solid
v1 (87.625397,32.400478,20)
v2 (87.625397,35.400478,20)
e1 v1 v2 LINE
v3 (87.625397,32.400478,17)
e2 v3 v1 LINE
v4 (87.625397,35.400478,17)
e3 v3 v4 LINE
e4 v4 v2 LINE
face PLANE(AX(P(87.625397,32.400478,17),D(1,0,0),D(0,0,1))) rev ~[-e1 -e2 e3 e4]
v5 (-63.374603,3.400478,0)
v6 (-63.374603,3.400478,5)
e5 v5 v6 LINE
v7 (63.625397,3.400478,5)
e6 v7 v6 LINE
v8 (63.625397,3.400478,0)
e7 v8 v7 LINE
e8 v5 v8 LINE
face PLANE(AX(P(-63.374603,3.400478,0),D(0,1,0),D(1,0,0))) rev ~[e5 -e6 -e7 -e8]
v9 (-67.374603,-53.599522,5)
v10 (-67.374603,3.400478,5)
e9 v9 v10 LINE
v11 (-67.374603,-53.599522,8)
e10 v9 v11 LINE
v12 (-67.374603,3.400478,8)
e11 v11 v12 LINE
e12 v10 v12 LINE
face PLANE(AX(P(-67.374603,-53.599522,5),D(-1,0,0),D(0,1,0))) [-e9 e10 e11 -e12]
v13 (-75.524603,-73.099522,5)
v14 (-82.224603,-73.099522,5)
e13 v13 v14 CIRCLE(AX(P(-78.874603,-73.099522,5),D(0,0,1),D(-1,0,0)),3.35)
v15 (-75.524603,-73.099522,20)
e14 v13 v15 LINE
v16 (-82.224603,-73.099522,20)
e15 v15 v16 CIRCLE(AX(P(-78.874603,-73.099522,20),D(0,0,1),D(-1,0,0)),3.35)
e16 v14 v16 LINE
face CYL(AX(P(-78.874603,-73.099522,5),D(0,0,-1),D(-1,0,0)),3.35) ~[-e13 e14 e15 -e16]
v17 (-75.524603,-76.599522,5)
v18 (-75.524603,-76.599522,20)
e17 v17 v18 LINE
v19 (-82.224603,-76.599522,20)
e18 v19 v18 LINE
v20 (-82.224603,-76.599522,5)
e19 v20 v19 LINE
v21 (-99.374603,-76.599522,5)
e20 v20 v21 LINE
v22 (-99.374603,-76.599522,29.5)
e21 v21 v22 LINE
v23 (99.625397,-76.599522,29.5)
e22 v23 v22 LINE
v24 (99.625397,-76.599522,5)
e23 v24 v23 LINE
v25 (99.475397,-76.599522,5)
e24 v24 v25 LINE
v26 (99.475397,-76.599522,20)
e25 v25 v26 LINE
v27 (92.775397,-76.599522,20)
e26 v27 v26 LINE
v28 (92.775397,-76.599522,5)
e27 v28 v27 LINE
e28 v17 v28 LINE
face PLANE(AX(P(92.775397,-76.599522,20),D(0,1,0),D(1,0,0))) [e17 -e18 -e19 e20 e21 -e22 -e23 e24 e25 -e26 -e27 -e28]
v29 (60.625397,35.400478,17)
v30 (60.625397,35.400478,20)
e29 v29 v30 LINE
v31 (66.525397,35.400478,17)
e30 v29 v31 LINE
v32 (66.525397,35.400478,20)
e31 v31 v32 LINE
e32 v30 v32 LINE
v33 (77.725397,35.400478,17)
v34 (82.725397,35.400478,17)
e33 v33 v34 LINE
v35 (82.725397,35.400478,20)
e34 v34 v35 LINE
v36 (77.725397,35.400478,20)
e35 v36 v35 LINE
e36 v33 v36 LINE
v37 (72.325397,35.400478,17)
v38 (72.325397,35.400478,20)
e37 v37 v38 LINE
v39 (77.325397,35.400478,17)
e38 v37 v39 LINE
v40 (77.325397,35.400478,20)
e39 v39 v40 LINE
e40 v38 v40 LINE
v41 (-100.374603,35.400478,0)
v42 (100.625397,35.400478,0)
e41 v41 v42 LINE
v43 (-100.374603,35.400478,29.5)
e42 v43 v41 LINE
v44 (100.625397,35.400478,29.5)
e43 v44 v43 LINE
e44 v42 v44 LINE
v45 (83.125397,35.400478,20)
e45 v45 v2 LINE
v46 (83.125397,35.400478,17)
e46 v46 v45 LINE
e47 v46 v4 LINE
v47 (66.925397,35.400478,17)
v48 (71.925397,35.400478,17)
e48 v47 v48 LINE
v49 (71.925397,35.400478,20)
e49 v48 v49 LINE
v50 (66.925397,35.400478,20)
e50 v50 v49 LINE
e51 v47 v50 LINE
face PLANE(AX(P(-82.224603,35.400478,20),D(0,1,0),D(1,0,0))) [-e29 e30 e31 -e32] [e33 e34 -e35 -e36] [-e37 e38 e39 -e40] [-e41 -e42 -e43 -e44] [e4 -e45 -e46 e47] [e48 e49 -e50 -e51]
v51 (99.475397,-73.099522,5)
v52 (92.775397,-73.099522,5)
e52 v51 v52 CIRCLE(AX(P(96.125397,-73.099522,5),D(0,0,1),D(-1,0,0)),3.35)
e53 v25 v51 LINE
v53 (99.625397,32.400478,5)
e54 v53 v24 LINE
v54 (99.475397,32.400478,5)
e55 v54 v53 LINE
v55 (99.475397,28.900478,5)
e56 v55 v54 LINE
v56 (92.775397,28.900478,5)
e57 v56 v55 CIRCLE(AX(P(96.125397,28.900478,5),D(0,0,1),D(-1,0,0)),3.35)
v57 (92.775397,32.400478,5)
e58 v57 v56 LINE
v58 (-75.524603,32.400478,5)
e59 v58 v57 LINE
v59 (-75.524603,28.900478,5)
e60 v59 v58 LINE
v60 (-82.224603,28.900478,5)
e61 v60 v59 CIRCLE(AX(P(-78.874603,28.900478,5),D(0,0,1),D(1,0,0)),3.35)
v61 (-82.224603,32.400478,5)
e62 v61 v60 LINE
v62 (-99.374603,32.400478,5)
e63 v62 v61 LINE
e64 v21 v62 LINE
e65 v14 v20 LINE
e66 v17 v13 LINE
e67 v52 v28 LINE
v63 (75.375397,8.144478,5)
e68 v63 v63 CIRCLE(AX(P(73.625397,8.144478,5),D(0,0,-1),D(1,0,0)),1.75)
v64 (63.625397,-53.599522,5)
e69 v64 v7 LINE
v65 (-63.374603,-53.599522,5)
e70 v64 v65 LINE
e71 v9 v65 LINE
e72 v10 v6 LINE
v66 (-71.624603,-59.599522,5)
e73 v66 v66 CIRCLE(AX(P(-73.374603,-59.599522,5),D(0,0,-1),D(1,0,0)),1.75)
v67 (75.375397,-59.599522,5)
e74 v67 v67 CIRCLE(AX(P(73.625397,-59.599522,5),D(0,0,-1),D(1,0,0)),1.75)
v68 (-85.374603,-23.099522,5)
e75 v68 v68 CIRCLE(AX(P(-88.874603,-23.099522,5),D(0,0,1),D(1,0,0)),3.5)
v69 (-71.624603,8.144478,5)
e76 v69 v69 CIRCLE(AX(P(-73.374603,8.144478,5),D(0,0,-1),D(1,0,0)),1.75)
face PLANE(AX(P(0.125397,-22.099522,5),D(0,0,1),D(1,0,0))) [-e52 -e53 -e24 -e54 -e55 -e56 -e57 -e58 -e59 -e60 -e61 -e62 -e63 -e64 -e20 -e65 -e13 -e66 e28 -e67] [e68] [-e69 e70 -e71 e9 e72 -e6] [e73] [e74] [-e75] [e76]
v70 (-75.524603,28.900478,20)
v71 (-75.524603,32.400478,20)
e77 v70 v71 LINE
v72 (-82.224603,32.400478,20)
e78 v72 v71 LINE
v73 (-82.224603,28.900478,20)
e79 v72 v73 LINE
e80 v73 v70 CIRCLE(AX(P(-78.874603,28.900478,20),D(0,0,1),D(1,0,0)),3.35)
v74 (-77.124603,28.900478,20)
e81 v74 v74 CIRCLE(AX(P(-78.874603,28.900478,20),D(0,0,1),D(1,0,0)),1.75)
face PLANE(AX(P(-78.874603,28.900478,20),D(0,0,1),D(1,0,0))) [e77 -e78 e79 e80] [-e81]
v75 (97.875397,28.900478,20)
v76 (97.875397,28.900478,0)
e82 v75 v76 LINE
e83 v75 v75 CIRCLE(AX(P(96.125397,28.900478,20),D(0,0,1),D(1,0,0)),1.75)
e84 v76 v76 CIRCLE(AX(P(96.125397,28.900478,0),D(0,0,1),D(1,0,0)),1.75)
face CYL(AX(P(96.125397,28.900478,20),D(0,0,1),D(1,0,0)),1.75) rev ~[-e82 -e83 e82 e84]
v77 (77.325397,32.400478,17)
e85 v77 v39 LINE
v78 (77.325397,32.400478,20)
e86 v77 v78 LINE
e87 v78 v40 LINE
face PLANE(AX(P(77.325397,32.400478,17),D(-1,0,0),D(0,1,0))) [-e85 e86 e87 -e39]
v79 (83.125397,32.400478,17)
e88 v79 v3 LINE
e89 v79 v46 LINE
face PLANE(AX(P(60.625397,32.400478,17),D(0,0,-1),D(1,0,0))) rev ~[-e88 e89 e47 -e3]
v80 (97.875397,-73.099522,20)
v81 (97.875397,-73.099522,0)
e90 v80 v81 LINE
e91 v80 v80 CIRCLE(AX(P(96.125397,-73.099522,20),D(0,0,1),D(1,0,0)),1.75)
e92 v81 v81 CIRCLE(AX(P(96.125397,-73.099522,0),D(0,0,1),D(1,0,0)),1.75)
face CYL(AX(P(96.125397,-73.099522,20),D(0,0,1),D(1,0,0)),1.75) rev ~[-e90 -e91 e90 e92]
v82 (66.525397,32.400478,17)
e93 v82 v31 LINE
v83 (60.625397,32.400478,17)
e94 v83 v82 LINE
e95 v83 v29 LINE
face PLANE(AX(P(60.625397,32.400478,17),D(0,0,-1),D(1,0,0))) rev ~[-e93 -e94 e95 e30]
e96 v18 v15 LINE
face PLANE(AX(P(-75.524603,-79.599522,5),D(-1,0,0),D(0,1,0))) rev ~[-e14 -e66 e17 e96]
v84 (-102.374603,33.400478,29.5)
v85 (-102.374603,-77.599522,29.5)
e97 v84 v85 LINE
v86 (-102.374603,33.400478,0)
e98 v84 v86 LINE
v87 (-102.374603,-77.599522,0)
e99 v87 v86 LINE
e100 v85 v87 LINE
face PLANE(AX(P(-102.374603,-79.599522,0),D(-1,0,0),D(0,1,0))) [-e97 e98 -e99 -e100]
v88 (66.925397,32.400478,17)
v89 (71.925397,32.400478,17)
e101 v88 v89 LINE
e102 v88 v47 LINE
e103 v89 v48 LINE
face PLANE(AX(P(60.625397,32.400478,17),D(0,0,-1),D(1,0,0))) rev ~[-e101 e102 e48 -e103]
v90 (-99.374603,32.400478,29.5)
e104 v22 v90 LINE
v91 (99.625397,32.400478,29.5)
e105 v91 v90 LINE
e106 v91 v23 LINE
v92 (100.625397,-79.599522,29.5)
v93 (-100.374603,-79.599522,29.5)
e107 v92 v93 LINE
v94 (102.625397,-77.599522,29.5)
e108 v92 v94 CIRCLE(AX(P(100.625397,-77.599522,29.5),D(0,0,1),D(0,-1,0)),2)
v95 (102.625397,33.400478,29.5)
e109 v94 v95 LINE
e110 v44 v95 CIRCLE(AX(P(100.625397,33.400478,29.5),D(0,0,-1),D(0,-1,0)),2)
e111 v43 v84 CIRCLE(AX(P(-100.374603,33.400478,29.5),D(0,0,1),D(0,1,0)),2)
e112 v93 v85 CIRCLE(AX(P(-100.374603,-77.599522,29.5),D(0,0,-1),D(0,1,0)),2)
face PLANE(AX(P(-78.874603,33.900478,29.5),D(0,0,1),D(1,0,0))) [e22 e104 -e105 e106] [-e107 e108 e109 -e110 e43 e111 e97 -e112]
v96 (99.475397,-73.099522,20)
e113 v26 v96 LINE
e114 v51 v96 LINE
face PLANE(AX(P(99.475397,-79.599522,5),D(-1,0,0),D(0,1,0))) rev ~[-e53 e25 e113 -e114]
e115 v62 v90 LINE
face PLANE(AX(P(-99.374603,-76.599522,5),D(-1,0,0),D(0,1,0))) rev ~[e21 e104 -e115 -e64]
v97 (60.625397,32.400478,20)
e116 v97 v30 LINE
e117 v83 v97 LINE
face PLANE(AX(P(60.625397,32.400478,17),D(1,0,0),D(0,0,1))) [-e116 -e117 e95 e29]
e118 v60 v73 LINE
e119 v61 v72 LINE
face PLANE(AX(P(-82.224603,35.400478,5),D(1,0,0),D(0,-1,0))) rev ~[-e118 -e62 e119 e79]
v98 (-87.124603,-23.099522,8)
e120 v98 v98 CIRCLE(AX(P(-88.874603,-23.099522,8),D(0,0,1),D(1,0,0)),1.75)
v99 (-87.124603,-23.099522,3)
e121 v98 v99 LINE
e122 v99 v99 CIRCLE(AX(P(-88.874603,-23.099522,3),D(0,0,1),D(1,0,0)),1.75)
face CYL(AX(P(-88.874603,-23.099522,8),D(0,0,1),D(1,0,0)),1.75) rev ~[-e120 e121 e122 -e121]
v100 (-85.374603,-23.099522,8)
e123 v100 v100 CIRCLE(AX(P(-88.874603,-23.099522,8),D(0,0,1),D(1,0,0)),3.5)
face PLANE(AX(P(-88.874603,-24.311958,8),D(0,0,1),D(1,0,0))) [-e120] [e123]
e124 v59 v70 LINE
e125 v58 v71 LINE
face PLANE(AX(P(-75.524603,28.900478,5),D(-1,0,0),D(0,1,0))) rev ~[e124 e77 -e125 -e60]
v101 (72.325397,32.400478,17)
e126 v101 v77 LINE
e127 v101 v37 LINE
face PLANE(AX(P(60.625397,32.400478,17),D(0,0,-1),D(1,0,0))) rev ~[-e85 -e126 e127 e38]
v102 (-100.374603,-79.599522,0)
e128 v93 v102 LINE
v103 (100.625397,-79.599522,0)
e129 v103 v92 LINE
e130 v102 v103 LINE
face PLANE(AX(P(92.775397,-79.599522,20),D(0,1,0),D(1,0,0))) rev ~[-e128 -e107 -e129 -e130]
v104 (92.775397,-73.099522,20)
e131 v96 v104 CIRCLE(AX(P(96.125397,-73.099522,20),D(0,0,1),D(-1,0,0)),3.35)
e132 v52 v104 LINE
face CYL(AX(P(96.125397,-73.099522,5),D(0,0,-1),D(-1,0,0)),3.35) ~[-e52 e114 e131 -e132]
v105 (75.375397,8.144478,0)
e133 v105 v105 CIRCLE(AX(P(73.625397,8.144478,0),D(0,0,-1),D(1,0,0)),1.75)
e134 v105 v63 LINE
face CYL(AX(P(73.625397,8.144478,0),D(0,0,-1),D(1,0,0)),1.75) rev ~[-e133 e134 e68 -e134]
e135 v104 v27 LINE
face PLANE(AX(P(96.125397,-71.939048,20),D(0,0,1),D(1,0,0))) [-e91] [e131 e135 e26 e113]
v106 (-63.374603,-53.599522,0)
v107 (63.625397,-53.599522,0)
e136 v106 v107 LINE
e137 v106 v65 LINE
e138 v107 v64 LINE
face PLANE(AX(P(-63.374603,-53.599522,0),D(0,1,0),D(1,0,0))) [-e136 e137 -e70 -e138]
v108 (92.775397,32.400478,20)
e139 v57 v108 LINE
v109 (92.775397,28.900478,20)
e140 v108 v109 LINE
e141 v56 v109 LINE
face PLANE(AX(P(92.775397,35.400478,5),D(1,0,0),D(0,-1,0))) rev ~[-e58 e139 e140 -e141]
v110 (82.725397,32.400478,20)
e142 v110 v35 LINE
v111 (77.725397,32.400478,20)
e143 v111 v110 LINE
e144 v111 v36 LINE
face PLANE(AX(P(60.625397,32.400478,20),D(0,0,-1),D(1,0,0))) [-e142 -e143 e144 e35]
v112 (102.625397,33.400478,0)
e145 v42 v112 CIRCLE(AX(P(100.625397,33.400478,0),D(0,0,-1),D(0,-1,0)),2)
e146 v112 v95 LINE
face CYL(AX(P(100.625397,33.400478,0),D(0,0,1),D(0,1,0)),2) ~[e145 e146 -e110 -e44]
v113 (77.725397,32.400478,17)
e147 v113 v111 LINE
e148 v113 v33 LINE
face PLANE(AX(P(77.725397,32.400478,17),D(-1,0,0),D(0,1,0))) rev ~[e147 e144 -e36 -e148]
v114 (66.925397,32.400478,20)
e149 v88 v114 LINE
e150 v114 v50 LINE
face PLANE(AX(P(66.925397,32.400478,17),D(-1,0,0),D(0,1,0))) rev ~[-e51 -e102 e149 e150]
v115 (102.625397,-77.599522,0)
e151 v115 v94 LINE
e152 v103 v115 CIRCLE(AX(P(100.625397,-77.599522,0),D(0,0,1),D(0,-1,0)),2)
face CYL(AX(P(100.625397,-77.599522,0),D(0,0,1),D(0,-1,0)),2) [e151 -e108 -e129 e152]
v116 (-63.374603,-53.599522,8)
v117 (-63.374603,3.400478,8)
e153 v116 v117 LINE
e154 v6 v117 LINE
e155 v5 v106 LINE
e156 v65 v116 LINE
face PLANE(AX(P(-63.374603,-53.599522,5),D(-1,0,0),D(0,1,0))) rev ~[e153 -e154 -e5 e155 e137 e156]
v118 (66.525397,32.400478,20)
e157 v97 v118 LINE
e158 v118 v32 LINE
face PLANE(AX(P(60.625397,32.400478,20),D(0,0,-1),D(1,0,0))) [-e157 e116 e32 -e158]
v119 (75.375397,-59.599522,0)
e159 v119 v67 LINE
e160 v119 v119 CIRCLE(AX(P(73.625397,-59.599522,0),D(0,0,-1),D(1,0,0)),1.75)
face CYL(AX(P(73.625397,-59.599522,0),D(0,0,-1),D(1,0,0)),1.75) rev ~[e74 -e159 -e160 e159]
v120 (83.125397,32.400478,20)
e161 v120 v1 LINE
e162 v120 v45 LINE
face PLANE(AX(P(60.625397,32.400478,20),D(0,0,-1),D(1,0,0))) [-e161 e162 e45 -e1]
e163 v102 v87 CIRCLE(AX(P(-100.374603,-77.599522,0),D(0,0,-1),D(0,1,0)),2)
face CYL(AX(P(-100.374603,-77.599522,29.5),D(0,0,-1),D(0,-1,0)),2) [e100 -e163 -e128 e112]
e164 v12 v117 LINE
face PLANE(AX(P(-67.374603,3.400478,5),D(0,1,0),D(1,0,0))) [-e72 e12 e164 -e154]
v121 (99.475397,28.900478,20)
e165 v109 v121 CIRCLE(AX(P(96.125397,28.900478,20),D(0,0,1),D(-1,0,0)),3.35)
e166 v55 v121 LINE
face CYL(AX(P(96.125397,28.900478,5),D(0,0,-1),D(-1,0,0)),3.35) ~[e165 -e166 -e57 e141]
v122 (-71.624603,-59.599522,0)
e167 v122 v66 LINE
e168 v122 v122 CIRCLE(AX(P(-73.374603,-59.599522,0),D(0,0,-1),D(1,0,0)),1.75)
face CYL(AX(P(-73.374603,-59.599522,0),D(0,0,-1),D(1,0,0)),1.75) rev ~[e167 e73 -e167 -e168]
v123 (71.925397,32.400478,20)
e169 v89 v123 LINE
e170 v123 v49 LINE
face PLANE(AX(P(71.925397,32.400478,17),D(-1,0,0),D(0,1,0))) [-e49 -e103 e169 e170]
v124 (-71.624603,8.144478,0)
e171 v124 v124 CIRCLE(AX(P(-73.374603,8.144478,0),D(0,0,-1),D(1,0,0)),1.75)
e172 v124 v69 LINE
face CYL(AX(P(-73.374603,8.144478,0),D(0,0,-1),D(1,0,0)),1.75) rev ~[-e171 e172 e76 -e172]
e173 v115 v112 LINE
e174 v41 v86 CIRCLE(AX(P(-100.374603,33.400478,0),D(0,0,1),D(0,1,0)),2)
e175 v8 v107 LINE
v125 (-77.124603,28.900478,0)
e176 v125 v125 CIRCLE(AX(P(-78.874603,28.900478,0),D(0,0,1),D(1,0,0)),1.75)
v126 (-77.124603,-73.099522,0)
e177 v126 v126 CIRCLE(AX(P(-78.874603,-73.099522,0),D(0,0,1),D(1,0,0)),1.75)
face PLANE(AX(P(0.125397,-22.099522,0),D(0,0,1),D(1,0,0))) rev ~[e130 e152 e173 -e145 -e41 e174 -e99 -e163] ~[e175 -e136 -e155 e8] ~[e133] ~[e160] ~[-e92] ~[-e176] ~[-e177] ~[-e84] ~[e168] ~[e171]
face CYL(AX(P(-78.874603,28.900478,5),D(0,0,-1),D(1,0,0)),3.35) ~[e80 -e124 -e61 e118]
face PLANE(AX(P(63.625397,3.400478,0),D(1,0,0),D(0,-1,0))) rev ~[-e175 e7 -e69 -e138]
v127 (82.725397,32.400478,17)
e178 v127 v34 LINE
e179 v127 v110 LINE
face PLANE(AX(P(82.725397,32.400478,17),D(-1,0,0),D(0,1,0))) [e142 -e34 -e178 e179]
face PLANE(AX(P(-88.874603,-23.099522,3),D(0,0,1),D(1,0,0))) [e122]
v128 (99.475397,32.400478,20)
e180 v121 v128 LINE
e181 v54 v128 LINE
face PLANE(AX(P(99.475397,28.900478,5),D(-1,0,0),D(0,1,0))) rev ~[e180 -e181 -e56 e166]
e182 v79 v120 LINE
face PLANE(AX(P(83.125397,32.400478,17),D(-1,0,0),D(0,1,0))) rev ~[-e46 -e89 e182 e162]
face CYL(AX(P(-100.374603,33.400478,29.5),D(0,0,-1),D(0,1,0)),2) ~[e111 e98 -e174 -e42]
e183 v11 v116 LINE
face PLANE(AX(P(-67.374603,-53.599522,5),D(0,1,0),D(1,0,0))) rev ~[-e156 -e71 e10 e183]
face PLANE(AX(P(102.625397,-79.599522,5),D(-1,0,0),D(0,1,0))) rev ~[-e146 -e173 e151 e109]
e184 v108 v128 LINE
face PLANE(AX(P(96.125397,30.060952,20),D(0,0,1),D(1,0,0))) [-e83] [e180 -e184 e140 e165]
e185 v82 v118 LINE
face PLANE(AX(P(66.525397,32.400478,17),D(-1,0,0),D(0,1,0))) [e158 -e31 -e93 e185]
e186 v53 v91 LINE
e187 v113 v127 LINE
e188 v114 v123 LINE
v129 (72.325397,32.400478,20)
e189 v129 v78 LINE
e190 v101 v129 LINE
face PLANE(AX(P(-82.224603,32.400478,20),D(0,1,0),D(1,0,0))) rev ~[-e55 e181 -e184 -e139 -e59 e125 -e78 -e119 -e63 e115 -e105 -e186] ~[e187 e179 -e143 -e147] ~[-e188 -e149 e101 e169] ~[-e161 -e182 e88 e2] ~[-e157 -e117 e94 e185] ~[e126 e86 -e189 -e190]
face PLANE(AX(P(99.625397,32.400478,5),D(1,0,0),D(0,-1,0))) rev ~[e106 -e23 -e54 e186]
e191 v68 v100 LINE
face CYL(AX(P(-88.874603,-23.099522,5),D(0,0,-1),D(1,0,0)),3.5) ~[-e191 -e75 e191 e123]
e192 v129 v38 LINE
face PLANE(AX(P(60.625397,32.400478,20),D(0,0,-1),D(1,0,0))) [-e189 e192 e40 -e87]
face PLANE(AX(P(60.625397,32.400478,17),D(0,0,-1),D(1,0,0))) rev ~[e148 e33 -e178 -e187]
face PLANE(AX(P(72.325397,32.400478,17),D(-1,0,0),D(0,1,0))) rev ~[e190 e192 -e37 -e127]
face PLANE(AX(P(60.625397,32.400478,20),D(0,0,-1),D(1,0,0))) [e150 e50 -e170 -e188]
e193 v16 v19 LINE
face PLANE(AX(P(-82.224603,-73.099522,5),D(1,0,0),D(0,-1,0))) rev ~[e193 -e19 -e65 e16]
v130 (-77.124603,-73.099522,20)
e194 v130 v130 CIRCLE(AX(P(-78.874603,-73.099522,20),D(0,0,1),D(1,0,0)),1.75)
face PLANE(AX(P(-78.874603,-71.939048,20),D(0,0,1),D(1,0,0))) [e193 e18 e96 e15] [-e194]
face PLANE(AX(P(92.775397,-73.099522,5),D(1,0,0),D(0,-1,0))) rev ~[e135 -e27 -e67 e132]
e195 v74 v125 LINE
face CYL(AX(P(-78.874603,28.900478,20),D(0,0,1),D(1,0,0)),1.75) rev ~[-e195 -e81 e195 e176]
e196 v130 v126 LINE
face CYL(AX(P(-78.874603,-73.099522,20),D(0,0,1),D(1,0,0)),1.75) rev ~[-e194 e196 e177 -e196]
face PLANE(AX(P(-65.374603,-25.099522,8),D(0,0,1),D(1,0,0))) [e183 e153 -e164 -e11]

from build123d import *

# Parameters (mm, degrees)
F0_W      = 205
F0_H      = 115
F1_DEPTH  = 5
F2_R      = 1.75
F3_DEPTH  = 25
F4_W      = 127
F4_H      = 57
F5_DEPTH  = 25
F7_DEPTH  = 15
F9_DEPTH  = 3
F10_W     = 4
F10_H     = 57
F11_DEPTH = 3
F12_R     = 1.75
F13_DEPTH = 25
F14_R     = 1.75
F15_DEPTH = 25
F16_R     = 1.75
F17_DEPTH = 25
F18_R     = 1.75
F19_DEPTH = 25
F20_R     = 1.75
F21_DEPTH = 5
F22_W     = 168.3
F22_H     = 3
F23_DEPTH = 24.5
F24_R     = 2
F25_W     = 27
F25_H     = 3
F26_DEPTH = 25
F27_W     = 0.4
F27_H     = 3
F28_DEPTH = 3
F29_W     = 6.7
F29_H     = 3
F30_DEPTH = 9.5
F31_W     = 6.7
F31_H     = 3
F32_DEPTH = 9.5
F33_W     = 6.7
F33_H     = 3
F34_DEPTH = 9.5
F35_W     = 6.7
F35_H     = 3
F36_DEPTH = 9.5


# Not quite as in the source:
# - a feature names something its author has since deleted; it is built from what else it names


with BuildPart() as f1:
    # F0 (on Top) → F1 (new body)
    with BuildSketch(Plane.XY):
        with Locations((0.1253969967, -22.0995221115)):
            Rectangle(F0_W, F0_H)
    extrude(amount=F1_DEPTH)

    # F2 (on face) → F3 (cut)
    with BuildSketch(Plane(origin=(0, 0, 0), x_dir=(1, 0, 0), z_dir=(0, 0, -1))):
        with Locations((-73.3746030033, 59.5995221115)):
            Circle(F2_R)
        with Locations((-73.3746030033, -8.1444778885)):
            Circle(F2_R)
        with Locations((73.6253969967, 59.5995221115)):
            Circle(F2_R)
        with Locations((73.6253969967, -8.1444778885)):
            Circle(F2_R)
    extrude(amount=-F3_DEPTH, mode=Mode.SUBTRACT)

    # F4 (on face) → F5 (cut)
    with BuildSketch(Plane(origin=(0, 0, 0), x_dir=(1, 0, 0), z_dir=(0, 0, -1))):
        with Locations((0.1253969967, 25.0995221115)):
            Rectangle(F4_W, F4_H)
    extrude(amount=-F5_DEPTH, mode=Mode.SUBTRACT)

    # F6 (on face) → F7 (join)
    with BuildSketch(Plane.XY.offset(5)):
        with BuildLine():
            Line((96.1253969967, -73.0995221115), (99.4753969967, -73.0995221115))
            ThreePointArc((99.4753969967, -73.0995221115), (96.1253969967, -69.7495221115), (92.7753969967, -73.0995221115))
            Line((92.7753969967, -73.0995221115), (96.1253969967, -73.0995221115))
        make_face()
        with BuildLine():
            ThreePointArc((92.7753969967, -73.0995221115), (96.1253969967, -76.4495221115), (99.4753969967, -73.0995221115))
            Line((99.4753969967, -73.0995221115), (96.1253969967, -73.0995221115))
            Line((96.1253969967, -73.0995221115), (92.7753969967, -73.0995221115))
        make_face()
        with BuildLine():
            Line((-78.8746030033, -73.0995221115), (-75.5246030033, -73.0995221115))
            ThreePointArc((-75.5246030033, -73.0995221115), (-78.8746030033, -69.7495221115), (-82.2246030033, -73.0995221115))
            Line((-82.2246030033, -73.0995221115), (-78.8746030033, -73.0995221115))
        make_face()
        with BuildLine():
            ThreePointArc((-82.2246030033, -73.0995221115), (-78.8746030033, -76.4495221115), (-75.5246030033, -73.0995221115))
            Line((-75.5246030033, -73.0995221115), (-78.8746030033, -73.0995221115))
            Line((-78.8746030033, -73.0995221115), (-82.2246030033, -73.0995221115))
        make_face()
        with BuildLine():
            Line((96.1253969967, 28.9004778885), (99.4753969967, 28.9004778885))
            ThreePointArc((99.4753969967, 28.9004778885), (96.1253969967, 32.2504778885), (92.7753969967, 28.9004778885))
            Line((92.7753969967, 28.9004778885), (96.1253969967, 28.9004778885))
        make_face()
        with BuildLine():
            ThreePointArc((92.7753969967, 28.9004778885), (96.1253969967, 25.5504778885), (99.4753969967, 28.9004778885))
            Line((99.4753969967, 28.9004778885), (96.1253969967, 28.9004778885))
            Line((96.1253969967, 28.9004778885), (92.7753969967, 28.9004778885))
        make_face()
        with BuildLine():
            ThreePointArc((-82.2246030033, 28.9004778885), (-78.8746030033, 25.5504778885), (-75.5246030033, 28.9004778885))
            ThreePointArc((-75.5246030033, 28.9004778885), (-78.8746030033, 32.2504778885), (-82.2246030033, 28.9004778885))
        make_face()
        with BuildLine():
            Line((-82.2246030033, -79.5995221115), (-75.5246030033, -79.5995221115))
            Line((-75.5246030033, -79.5995221115), (-75.5246030033, -73.0995221115))
            ThreePointArc((-75.5246030033, -73.0995221115), (-78.8746030033, -76.4495221115), (-82.2246030033, -73.0995221115))
            Line((-82.2246030033, -73.0995221115), (-82.2246030033, -79.5995221115))
        make_face()
        with BuildLine():
            Line((-75.5246030033, 28.9004778885), (-75.5246030033, 35.4004778885))
            Line((-75.5246030033, 35.4004778885), (-82.2246030033, 35.4004778885))
            Line((-82.2246030033, 35.4004778885), (-82.2246030033, 28.9004778885))
            ThreePointArc((-82.2246030033, 28.9004778885), (-78.8746030033, 32.2504778885), (-75.5246030033, 28.9004778885))
        make_face()
        with BuildLine():
            Line((99.4753969967, 28.9004778885), (99.4753969967, 35.4004778885))
            Line((99.4753969967, 35.4004778885), (92.7753969967, 35.4004778885))
            Line((92.7753969967, 35.4004778885), (92.7753969967, 28.9004778885))
            ThreePointArc((92.7753969967, 28.9004778885), (96.1253969967, 32.2504778885), (99.4753969967, 28.9004778885))
        make_face()
        with BuildLine():
            Line((99.4753969967, -79.5995221115), (99.4753969967, -73.0995221115))
            ThreePointArc((99.4753969967, -73.0995221115), (96.1253969967, -76.4495221115), (92.7753969967, -73.0995221115))
            Line((92.7753969967, -73.0995221115), (92.7753969967, -79.5995221115))
            Line((92.7753969967, -79.5995221115), (99.4753969967, -79.5995221115))
        make_face()
    extrude(amount=F7_DEPTH)

    # F8 (on face) → F9 (join)
    with BuildSketch(Plane.XY.offset(5)):
        with BuildLine():
            ThreePointArc((-92.3746030033, -23.0995221115), (-88.8746030033, -26.5995221115), (-85.3746030033, -23.0995221115))
            Line((-85.3746030033, -23.0995221115), (-92.3746030033, -23.0995221115))
        make_face()
        with BuildLine():
            Line((-92.3746030033, -23.0995221115), (-85.3746030033, -23.0995221115))
            ThreePointArc((-85.3746030033, -23.0995221115), (-88.8746030033, -19.5995221115), (-92.3746030033, -23.0995221115))
        make_face()
    extrude(amount=F9_DEPTH)

    # F10 (on face) → F11 (join)
    with BuildSketch(Plane.XY.offset(5)):
        with Locations((-65.3746030033, -25.0995221115)):
            Rectangle(F10_W, F10_H)
    extrude(amount=F11_DEPTH)

    # F12 (on face) → F13 (cut)
    with BuildSketch(Plane.XY.offset(20)):
        with Locations((-78.8746030033, -73.0995221115)):
            Circle(F12_R)
    extrude(amount=-F13_DEPTH, mode=Mode.SUBTRACT)

    # F14 (on face) → F15 (cut)
    with BuildSketch(Plane.XY.offset(20)):
        with Locations((-78.8746030033, 28.9004778885)):
            Circle(F14_R)
    extrude(amount=-F15_DEPTH, mode=Mode.SUBTRACT)

    # F16 (on face) → F17 (cut)
    with BuildSketch(Plane.XY.offset(20)):
        with Locations((96.1253969967, -73.0995221115)):
            Circle(F16_R)
    extrude(amount=-F17_DEPTH, mode=Mode.SUBTRACT)

    # F18 (on face) → F19 (cut)
    with BuildSketch(Plane.XY.offset(20)):
        with Locations((96.1253969967, 28.9004778885)):
            Circle(F18_R)
    extrude(amount=-F19_DEPTH, mode=Mode.SUBTRACT)

    # F20 (on face) → F21 (cut)
    with BuildSketch(Plane.XY.offset(8)):
        with Locations((-88.8746030033, -23.0995221115)):
            Circle(F20_R)
    extrude(amount=-F21_DEPTH, mode=Mode.SUBTRACT)

    # F22 (on face) → F23 (join)
    with BuildSketch(Plane.XY.offset(5)):
        Polygon((99.4753969967, -79.5995221115), (102.6253969967, -79.5995221115), (102.6253969967, 35.4004778885), (99.4753969967, 35.4004778885), (99.4753969967, 32.4004778885), (99.6253969967, 32.4004778885), (99.6253969967, -76.5995221115), (99.4753969967, -76.5995221115), align=None)
        Polygon((-102.3746030033, -79.5995221115), (-82.2246030033, -79.5995221115), (-82.2246030033, -76.5995221115), (-99.3746030033, -76.5995221115), (-99.3746030033, 32.4004778885), (-82.2246030033, 32.4004778885), (-82.2246030033, 35.4004778885), (-102.3746030033, 35.4004778885), align=None)
        with Locations((8.6253969967, -78.0995221115)):
            Rectangle(F22_W, F22_H)
        with Locations((8.6253969967, 33.9004778885)):
            Rectangle(F22_W, F22_H)
    extrude(amount=F23_DEPTH)

    # F24
    f24_edges = [f1.edges().sort_by_distance(p)[0] for p in [
        (-102.374603, -79.599522, 14.75),
        (102.625397, -79.599522, 14.75),
        (102.625397, 35.400478, 14.75),
        (-102.374603, 35.400478, 14.75),
    ]]
    fillet(f24_edges, radius=F24_R)

    # F25 (on face) → F26 (cut)
    with BuildSketch(Plane.XZ.offset(-32.4004778885)):
        with Locations((74.1253969967, 18.5)):
            Rectangle(F25_W, F25_H)
    extrude(amount=-F26_DEPTH, mode=Mode.SUBTRACT)

    # F27 (on face) → F28 (join)
    with BuildSketch(Plane.XY.offset(17)):
        with Locations((82.9253969967, 33.9004778885)):
            Rectangle(F27_W, F27_H)
        with Locations((77.5253969967, 33.9004778885)):
            Rectangle(F27_W, F27_H)
        with Locations((72.1253969967, 33.9004778885)):
            Rectangle(F27_W, F27_H)
        with Locations((66.7253969967, 33.9004778885)):
            Rectangle(F27_W, F27_H)
    extrude(amount=F28_DEPTH)

    # F29 (on face) → F30 (join)
    with BuildSketch(Plane.XY.offset(20)):
        with Locations((-78.8746030033, -78.0995221115)):
            Rectangle(F29_W, F29_H)
    extrude(amount=F30_DEPTH)

    # F31 (on face) → F32 (join)
    with BuildSketch(Plane.XY.offset(20)):
        with Locations((96.1253969967, -78.0995221115)):
            Rectangle(F31_W, F31_H)
    extrude(amount=F32_DEPTH)

    # F33 (on face) → F34 (join)
    with BuildSketch(Plane.XY.offset(20)):
        with Locations((96.1253969967, 33.9004778885)):
            Rectangle(F33_W, F33_H)
    extrude(amount=F34_DEPTH)

    # F35 (on face) → F36 (join)
    with BuildSketch(Plane.XY.offset(20)):
        with Locations((-78.8746030033, 33.9004778885)):
            Rectangle(F35_W, F35_H)
    extrude(amount=F36_DEPTH)


solid = f1.part
